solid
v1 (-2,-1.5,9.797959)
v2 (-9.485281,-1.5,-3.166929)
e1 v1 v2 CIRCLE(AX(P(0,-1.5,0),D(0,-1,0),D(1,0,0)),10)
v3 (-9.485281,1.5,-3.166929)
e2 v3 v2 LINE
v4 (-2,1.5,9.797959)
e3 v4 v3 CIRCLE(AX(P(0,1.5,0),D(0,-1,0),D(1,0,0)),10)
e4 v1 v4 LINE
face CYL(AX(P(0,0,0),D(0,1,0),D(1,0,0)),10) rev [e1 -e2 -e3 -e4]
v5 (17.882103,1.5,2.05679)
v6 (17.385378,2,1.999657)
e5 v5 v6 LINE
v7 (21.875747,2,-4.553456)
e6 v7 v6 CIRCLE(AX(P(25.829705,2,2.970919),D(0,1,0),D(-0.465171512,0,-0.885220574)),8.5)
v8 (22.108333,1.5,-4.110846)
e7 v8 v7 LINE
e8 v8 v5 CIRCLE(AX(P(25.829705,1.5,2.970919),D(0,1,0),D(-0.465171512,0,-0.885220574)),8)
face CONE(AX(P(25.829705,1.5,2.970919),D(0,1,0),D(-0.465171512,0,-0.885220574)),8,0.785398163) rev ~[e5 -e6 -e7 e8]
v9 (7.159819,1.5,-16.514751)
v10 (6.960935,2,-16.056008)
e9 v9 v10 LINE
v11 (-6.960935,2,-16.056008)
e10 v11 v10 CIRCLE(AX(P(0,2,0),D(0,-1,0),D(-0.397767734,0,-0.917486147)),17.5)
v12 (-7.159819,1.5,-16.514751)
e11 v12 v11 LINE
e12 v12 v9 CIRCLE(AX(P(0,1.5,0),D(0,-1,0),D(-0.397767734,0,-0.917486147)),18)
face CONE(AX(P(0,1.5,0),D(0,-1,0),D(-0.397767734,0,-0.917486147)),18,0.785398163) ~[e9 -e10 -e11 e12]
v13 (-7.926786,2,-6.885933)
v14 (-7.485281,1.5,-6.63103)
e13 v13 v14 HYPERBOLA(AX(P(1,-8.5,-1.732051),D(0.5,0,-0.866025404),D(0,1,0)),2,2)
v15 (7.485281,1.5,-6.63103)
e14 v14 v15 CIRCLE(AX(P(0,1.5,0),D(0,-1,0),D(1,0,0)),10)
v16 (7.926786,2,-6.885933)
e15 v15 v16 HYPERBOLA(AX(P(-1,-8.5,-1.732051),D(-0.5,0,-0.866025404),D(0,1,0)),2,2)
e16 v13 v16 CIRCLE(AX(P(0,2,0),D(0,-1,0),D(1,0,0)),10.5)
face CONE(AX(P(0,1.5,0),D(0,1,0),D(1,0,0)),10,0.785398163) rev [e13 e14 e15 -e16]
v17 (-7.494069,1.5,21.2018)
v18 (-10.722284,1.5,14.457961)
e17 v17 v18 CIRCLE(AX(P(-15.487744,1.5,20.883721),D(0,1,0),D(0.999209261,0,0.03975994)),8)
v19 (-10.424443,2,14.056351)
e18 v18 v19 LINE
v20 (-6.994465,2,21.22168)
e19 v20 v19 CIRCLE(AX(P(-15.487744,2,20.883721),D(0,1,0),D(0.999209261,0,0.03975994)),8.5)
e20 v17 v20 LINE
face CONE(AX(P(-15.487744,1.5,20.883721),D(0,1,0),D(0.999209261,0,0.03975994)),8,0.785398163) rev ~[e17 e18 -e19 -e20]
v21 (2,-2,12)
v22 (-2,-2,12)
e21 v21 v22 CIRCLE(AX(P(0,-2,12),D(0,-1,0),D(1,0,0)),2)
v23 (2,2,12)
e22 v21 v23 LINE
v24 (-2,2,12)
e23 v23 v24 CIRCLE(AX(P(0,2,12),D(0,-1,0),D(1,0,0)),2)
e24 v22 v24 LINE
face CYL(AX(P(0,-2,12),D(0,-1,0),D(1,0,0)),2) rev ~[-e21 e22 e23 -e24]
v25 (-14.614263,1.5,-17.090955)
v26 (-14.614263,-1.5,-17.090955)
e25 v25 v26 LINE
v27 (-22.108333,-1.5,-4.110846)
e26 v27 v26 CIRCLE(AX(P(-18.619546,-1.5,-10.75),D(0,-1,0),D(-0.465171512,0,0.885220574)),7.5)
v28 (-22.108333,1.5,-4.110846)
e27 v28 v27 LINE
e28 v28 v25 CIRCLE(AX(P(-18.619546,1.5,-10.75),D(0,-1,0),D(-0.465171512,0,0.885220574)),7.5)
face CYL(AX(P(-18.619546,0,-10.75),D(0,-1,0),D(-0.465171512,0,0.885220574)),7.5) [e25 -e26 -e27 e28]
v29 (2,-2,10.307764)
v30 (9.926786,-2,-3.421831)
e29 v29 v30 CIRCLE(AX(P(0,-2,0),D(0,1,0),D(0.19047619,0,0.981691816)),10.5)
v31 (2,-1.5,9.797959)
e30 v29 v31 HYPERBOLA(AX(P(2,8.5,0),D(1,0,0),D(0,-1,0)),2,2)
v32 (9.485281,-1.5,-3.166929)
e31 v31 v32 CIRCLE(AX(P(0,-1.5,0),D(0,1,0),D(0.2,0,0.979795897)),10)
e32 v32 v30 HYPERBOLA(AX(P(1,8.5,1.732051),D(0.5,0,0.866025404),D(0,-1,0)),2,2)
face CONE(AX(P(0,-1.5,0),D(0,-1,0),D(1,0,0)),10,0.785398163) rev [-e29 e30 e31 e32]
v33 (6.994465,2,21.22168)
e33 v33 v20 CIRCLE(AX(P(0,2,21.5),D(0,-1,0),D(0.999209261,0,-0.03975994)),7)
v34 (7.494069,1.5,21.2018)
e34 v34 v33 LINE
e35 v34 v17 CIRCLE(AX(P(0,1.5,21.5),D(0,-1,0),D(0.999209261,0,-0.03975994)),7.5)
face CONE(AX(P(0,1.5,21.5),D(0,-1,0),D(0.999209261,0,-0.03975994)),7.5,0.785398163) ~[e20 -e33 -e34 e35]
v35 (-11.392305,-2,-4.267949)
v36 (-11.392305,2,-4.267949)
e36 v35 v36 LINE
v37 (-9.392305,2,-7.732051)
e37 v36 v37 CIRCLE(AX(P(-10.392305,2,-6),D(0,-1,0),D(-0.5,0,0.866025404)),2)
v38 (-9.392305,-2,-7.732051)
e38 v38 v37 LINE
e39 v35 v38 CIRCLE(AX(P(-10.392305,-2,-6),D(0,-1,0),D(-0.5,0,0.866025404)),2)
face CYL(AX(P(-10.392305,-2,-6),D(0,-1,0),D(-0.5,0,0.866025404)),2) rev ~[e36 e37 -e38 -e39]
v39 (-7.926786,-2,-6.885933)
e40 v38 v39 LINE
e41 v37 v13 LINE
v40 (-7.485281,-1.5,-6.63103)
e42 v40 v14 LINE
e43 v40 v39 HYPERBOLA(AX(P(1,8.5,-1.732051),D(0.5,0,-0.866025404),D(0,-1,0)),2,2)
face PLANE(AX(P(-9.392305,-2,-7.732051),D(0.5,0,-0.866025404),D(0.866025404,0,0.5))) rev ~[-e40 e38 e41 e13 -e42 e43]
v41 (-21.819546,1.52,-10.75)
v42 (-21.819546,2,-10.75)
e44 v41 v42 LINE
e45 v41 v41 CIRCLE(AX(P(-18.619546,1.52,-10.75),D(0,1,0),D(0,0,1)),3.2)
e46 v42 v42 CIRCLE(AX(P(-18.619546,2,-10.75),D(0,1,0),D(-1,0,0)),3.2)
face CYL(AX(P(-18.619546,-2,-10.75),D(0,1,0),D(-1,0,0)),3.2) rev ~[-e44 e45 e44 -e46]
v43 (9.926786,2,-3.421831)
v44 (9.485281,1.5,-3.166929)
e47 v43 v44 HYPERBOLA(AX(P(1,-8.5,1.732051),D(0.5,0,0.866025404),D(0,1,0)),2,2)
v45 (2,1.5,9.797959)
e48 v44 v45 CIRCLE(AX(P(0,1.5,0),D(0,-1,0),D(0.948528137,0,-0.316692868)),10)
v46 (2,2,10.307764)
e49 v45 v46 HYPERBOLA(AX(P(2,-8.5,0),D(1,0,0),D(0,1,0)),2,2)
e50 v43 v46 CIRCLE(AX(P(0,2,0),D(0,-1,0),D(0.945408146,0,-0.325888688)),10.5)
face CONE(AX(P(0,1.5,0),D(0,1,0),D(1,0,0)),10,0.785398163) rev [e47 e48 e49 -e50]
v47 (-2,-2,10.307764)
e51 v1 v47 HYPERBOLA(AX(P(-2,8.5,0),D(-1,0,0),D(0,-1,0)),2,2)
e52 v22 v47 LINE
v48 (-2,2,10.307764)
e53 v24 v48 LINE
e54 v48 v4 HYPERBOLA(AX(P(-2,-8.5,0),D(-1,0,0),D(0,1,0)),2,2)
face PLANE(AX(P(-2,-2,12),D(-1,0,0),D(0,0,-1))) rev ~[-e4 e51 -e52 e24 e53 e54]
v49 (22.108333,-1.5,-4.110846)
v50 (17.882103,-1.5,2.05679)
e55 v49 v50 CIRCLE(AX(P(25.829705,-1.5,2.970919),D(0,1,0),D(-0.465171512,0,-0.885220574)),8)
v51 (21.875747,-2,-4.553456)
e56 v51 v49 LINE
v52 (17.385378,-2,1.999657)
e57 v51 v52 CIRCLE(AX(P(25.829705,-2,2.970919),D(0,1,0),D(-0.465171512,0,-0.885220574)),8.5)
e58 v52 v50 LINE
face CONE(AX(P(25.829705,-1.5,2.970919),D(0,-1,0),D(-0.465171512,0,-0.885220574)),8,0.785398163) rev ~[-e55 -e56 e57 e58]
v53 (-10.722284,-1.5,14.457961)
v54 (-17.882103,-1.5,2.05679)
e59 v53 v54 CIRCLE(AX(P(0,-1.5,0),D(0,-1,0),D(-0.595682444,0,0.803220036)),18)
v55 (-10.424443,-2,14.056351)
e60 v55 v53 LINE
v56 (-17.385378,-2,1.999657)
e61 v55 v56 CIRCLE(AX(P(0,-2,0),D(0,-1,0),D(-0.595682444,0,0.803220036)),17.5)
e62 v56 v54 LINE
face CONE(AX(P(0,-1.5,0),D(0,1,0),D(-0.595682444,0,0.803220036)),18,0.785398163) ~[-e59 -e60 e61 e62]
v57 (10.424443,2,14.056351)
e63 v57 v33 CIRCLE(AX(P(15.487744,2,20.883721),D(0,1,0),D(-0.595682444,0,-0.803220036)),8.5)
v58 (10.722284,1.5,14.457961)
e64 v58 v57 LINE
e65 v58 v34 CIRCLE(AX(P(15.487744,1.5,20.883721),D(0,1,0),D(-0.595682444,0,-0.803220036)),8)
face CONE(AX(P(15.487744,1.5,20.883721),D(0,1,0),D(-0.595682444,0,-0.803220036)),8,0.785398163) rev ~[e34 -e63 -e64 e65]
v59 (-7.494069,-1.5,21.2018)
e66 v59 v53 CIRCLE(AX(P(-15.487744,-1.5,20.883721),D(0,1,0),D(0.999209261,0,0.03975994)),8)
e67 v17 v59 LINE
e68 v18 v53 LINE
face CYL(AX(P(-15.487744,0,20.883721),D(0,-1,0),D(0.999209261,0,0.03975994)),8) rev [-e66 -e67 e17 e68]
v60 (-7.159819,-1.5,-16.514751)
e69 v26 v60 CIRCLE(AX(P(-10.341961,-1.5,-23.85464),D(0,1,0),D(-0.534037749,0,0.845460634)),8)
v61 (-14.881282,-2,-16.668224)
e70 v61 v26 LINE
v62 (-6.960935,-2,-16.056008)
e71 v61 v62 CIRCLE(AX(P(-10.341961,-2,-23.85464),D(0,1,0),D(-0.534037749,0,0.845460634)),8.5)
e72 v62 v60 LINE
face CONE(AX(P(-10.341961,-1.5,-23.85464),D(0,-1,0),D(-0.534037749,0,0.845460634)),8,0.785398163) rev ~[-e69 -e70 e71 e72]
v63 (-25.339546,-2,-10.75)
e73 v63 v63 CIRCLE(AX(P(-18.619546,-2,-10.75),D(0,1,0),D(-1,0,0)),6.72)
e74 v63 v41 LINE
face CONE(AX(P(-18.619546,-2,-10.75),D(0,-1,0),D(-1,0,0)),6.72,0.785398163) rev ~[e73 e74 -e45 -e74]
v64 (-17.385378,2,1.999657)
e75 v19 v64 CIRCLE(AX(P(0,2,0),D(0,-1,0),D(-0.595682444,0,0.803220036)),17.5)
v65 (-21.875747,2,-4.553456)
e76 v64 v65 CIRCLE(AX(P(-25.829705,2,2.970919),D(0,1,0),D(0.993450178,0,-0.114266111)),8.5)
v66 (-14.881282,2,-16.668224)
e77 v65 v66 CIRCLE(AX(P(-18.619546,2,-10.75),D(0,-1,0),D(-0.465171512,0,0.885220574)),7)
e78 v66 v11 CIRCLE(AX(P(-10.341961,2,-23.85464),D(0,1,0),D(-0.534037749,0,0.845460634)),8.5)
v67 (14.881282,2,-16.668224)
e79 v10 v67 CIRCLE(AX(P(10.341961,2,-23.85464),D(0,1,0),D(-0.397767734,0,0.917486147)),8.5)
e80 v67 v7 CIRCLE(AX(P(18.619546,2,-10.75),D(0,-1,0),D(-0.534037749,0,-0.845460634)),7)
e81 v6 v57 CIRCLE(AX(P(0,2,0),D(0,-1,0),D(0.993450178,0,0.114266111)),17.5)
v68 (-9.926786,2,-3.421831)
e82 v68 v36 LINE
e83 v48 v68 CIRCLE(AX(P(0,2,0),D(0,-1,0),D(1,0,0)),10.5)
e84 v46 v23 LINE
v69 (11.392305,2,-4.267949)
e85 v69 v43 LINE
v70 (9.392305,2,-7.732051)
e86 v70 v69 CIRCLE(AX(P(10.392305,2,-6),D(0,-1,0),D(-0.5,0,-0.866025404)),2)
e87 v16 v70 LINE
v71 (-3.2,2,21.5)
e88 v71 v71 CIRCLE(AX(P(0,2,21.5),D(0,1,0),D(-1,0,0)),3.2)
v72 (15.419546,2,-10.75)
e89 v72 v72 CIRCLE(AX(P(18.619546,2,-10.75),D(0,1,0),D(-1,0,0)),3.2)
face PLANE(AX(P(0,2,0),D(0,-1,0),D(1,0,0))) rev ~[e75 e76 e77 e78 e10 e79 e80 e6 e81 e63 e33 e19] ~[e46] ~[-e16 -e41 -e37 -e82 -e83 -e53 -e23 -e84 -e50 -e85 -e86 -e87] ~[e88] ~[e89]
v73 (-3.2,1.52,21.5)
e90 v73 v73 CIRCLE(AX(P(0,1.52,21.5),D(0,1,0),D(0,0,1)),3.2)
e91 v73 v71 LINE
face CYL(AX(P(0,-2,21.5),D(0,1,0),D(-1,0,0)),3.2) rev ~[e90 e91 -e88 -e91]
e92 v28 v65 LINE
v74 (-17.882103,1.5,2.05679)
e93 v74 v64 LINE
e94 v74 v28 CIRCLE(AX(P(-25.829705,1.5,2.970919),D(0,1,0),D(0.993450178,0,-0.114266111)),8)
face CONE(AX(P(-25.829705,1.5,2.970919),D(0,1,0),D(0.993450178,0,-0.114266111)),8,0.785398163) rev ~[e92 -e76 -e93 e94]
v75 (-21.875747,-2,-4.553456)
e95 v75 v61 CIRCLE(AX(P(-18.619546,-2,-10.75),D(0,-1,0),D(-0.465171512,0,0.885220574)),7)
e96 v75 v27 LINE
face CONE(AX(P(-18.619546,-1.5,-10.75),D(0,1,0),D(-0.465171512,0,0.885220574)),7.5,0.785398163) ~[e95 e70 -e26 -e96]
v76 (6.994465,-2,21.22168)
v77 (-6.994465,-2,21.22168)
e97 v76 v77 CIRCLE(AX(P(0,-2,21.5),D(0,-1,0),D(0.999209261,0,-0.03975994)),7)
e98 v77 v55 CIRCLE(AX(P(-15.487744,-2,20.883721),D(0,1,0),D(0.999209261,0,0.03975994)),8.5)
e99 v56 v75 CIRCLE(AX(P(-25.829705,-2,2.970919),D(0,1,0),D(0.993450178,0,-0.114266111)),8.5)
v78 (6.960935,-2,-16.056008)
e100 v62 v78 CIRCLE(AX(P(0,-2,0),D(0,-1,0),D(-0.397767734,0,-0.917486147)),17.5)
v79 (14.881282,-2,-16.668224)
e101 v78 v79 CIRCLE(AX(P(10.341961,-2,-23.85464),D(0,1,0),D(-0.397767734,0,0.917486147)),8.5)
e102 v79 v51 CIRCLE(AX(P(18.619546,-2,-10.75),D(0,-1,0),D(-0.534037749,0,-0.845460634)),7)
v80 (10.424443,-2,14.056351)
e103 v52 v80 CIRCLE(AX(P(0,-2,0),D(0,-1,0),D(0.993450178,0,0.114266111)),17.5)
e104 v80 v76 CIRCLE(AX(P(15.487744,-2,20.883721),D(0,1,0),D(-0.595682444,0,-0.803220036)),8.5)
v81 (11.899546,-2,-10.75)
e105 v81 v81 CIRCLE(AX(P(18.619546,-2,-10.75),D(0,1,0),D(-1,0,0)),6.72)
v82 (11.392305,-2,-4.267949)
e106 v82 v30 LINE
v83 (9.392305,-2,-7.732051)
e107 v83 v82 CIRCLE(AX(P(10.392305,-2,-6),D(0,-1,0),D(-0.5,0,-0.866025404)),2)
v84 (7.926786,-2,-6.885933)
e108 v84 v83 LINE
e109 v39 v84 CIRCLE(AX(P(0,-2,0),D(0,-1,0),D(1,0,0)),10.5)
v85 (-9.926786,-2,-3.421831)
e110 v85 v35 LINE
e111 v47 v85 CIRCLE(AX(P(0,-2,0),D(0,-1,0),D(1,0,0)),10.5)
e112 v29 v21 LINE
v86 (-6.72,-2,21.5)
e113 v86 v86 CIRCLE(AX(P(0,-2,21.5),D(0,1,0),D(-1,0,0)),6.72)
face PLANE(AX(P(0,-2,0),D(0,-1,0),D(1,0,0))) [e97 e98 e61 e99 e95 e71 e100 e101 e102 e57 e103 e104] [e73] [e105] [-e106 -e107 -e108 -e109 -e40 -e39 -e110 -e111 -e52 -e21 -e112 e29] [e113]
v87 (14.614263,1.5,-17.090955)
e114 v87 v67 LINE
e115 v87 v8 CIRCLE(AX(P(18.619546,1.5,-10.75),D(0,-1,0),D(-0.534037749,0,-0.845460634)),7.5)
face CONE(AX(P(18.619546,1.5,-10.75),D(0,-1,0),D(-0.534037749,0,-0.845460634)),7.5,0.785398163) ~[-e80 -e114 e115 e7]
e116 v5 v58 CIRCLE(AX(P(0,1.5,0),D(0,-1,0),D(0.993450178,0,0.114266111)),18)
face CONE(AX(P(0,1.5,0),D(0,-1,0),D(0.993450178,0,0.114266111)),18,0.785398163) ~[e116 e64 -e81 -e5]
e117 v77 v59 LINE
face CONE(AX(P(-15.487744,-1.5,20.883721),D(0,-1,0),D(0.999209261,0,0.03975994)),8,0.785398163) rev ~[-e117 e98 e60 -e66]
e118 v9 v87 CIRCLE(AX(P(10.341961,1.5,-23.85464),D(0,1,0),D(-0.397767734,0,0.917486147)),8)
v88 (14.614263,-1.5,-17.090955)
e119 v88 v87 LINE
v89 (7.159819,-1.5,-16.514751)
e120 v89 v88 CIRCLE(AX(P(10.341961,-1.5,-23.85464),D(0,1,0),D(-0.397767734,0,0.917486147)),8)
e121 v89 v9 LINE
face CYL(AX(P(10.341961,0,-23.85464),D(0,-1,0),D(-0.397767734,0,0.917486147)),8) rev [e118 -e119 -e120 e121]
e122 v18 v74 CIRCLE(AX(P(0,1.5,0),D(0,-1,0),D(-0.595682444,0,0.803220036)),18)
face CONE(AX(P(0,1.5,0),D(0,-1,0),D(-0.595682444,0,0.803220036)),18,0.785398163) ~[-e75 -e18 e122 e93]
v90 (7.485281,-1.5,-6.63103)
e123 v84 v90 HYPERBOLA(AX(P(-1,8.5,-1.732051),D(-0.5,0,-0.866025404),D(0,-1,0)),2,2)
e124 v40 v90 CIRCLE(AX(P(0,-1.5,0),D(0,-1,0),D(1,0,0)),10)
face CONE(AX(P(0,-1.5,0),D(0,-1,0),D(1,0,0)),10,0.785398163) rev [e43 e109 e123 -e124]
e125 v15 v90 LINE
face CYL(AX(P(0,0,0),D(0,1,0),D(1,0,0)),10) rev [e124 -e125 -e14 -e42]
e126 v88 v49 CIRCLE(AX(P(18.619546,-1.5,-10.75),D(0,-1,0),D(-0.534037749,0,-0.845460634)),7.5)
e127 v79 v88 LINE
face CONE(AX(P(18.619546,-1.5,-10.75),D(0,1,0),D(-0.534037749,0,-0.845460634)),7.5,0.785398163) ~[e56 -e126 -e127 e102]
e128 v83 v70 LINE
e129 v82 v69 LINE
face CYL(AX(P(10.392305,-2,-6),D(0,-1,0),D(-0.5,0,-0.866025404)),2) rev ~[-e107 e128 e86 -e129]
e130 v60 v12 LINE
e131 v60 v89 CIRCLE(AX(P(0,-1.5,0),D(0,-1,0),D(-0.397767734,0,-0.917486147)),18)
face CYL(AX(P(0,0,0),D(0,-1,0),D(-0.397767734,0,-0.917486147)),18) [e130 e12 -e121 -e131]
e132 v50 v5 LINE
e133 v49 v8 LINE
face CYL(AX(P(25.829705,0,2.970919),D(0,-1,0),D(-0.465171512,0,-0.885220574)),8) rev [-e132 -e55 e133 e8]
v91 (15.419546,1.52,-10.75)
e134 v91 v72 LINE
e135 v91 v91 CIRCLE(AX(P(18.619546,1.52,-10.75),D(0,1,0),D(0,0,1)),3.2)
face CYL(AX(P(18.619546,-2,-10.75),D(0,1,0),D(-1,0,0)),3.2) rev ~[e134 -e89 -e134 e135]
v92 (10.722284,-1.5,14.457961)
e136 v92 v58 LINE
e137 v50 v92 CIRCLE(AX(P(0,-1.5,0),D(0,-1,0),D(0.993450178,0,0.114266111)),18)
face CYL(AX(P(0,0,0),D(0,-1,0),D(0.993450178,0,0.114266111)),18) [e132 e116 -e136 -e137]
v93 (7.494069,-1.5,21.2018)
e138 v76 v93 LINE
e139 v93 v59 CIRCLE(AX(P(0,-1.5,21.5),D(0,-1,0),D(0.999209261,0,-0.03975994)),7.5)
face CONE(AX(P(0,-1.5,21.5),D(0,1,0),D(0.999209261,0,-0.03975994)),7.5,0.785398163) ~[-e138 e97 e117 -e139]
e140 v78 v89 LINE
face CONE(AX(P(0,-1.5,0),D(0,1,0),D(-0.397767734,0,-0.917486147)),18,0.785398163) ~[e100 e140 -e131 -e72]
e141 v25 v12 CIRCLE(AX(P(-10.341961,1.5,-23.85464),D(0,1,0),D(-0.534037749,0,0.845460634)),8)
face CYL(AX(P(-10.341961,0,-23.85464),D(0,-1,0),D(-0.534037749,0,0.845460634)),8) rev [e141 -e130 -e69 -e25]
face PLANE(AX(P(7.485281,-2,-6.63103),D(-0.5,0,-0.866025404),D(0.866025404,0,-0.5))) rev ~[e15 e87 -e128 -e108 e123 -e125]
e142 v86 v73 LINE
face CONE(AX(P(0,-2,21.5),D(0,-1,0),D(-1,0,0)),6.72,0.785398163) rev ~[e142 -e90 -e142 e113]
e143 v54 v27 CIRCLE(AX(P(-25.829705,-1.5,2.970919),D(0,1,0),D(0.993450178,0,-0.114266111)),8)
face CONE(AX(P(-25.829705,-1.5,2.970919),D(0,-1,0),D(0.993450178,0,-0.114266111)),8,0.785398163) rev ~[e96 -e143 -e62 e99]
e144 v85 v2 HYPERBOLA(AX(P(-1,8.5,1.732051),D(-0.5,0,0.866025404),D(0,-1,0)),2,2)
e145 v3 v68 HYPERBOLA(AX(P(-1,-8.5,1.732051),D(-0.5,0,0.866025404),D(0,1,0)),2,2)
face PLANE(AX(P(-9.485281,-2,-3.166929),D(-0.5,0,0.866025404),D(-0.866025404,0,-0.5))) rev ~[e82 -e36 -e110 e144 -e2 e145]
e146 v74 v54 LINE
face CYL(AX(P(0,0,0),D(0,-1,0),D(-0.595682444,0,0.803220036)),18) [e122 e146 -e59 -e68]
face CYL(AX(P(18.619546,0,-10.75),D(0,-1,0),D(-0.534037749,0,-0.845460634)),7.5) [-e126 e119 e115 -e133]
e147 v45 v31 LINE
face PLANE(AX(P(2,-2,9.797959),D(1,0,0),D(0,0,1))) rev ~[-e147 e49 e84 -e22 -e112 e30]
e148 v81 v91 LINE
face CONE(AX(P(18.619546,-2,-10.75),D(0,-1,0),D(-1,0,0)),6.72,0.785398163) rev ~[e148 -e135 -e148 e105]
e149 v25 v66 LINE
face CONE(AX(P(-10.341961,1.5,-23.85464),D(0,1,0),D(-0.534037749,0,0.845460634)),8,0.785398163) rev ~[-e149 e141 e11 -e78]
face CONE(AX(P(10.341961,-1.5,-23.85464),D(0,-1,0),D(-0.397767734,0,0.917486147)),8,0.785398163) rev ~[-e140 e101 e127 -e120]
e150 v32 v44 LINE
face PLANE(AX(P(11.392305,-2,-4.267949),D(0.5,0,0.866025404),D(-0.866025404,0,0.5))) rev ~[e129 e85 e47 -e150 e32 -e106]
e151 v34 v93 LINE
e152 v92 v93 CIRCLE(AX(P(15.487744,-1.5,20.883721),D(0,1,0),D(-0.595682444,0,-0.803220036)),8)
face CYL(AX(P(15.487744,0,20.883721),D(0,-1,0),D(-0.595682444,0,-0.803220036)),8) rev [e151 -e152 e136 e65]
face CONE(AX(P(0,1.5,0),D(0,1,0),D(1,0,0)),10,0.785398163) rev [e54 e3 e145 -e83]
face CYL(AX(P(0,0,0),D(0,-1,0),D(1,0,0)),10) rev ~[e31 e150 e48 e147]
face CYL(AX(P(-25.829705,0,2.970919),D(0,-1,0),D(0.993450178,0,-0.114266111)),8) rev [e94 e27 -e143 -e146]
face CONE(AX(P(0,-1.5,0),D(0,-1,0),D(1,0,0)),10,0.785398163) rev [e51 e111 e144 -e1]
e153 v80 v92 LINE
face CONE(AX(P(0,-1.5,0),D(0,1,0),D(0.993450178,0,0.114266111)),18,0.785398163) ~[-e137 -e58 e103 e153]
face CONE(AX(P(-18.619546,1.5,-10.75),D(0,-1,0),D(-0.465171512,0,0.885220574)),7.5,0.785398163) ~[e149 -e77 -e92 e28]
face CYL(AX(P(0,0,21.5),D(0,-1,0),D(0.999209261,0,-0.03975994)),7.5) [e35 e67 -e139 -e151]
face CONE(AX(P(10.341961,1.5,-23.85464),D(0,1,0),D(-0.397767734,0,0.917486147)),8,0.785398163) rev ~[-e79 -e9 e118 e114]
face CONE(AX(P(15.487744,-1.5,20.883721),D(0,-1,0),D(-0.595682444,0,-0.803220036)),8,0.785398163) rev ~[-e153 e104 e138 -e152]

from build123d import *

# Parameters (mm, degrees)
F0_R           = 10
F1_DEPTH       = 2
F1_DEPTH_BACK  = 2
F2_SIZE        = 0.5
F4_D           = 6.4
F4_CSINK_D     = 13.44
F4_CSINK_ANGLE = 90
F6_DEPTH       = 4.001


# Not quite as in the source:
# - a feature names something its author has since deleted; it is built from what else it names


with BuildPart() as f1:
    # F0 (on Front) → F1 (new body, two sides)
    with BuildSketch(Plane.XZ) as f1_sk:
        with BuildLine():
            ThreePointArc((10.7222839925, 14.457960644), (8.271877925, 17.429551948), (7.4940694571, 21.2018004501))
            ThreePointArc((7.4940694571, 21.2018004501), (0, 29), (-7.4940694571, 21.2018004501))
            ThreePointArc((-7.4940694571, 21.2018004501), (-8.271877925, 17.429551948), (-10.7222839925, 14.457960644))
            ThreePointArc((-10.7222839925, 14.457960644), (-15.5884572681, 9), (-17.8821032009, 2.0567900021))
            ThreePointArc((-17.8821032009, 2.0567900021), (-19.2303737261, -1.551119554), (-22.1083325243, -4.1108456974))
            ThreePointArc((-22.1083325243, -4.1108456974), (-25.1147367097, -14.5), (-14.6142630672, -17.0909547527))
            ThreePointArc((-14.6142630672, -17.0909547527), (-10.9584958011, -15.8784323941), (-7.1598192084, -16.5147506461))
            ThreePointArc((-7.1598192084, -16.5147506461), (0, -18), (7.1598192084, -16.5147506461))
            ThreePointArc((7.1598192084, -16.5147506461), (10.9584958011, -15.8784323941), (14.6142630672, -17.0909547527))
            ThreePointArc((14.6142630672, -17.0909547527), (25.1147367097, -14.5), (22.1083325243, -4.1108456974))
            ThreePointArc((22.1083325243, -4.1108456974), (19.2303737261, -1.551119554), (17.8821032009, 2.0567900021))
            ThreePointArc((17.8821032009, 2.0567900021), (15.5884572681, 9), (10.7222839925, 14.457960644))
        make_face()
        Circle(F0_R, mode=Mode.SUBTRACT)
    extrude(amount=F1_DEPTH)
    extrude(f1_sk.sketch, amount=-F1_DEPTH_BACK)

    # F2
    f2_edges = [f1.edges().sort_by_distance(p)[0] for p in [
        (0, -2, 29),
        (0, 2, 29),
        (-10, -2, 0),
        (-10, 2, 0),
    ]]
    chamfer(f2_edges, length=F2_SIZE)

    # F4 (through all)
    with Locations(Plane.XZ.offset(2)):
        with Locations((0, 21.5), (-18.6195461814, -10.75), (18.6195461814, -10.75)):
            CounterSinkHole(F4_D / 2, F4_CSINK_D / 2, counter_sink_angle=F4_CSINK_ANGLE)

    # F5 (on face) → F6 (cut, through all)
    with BuildSketch(Plane.XZ.offset(2)):
        with BuildLine():
            ThreePointArc((-2, 9.7979589711), (0, 10), (2, 9.7979589711))
            Line((2, 9.7979589711), (2, 12))
            ThreePointArc((2, 12), (0, 14), (-2, 12))
            Line((-2, 12), (-2, 9.7979589711))
        make_face()
        with BuildLine():
            Line((-9.3923048454, -7.7320508076), (-7.4852813742, -6.6310302931))
            ThreePointArc((-7.4852813742, -6.6310302931), (-8.6602540378, -5), (-9.4852813742, -3.166928678))
            Line((-9.4852813742, -3.166928678), (-11.3923048454, -4.2679491924))
            ThreePointArc((-11.3923048454, -4.2679491924), (-12.124355653, -7), (-9.3923048454, -7.7320508076))
        make_face()
        with BuildLine():
            Line((11.3923048454, -4.2679491924), (9.4852813742, -3.166928678))
            ThreePointArc((9.4852813742, -3.166928678), (8.6602540378, -5), (7.4852813742, -6.6310302931))
            Line((7.4852813742, -6.6310302931), (9.3923048454, -7.7320508076))
            ThreePointArc((9.3923048454, -7.7320508076), (12.124355653, -7), (11.3923048454, -4.2679491924))
        make_face()
    extrude(amount=-F6_DEPTH, mode=Mode.SUBTRACT)


solid = f1.part
